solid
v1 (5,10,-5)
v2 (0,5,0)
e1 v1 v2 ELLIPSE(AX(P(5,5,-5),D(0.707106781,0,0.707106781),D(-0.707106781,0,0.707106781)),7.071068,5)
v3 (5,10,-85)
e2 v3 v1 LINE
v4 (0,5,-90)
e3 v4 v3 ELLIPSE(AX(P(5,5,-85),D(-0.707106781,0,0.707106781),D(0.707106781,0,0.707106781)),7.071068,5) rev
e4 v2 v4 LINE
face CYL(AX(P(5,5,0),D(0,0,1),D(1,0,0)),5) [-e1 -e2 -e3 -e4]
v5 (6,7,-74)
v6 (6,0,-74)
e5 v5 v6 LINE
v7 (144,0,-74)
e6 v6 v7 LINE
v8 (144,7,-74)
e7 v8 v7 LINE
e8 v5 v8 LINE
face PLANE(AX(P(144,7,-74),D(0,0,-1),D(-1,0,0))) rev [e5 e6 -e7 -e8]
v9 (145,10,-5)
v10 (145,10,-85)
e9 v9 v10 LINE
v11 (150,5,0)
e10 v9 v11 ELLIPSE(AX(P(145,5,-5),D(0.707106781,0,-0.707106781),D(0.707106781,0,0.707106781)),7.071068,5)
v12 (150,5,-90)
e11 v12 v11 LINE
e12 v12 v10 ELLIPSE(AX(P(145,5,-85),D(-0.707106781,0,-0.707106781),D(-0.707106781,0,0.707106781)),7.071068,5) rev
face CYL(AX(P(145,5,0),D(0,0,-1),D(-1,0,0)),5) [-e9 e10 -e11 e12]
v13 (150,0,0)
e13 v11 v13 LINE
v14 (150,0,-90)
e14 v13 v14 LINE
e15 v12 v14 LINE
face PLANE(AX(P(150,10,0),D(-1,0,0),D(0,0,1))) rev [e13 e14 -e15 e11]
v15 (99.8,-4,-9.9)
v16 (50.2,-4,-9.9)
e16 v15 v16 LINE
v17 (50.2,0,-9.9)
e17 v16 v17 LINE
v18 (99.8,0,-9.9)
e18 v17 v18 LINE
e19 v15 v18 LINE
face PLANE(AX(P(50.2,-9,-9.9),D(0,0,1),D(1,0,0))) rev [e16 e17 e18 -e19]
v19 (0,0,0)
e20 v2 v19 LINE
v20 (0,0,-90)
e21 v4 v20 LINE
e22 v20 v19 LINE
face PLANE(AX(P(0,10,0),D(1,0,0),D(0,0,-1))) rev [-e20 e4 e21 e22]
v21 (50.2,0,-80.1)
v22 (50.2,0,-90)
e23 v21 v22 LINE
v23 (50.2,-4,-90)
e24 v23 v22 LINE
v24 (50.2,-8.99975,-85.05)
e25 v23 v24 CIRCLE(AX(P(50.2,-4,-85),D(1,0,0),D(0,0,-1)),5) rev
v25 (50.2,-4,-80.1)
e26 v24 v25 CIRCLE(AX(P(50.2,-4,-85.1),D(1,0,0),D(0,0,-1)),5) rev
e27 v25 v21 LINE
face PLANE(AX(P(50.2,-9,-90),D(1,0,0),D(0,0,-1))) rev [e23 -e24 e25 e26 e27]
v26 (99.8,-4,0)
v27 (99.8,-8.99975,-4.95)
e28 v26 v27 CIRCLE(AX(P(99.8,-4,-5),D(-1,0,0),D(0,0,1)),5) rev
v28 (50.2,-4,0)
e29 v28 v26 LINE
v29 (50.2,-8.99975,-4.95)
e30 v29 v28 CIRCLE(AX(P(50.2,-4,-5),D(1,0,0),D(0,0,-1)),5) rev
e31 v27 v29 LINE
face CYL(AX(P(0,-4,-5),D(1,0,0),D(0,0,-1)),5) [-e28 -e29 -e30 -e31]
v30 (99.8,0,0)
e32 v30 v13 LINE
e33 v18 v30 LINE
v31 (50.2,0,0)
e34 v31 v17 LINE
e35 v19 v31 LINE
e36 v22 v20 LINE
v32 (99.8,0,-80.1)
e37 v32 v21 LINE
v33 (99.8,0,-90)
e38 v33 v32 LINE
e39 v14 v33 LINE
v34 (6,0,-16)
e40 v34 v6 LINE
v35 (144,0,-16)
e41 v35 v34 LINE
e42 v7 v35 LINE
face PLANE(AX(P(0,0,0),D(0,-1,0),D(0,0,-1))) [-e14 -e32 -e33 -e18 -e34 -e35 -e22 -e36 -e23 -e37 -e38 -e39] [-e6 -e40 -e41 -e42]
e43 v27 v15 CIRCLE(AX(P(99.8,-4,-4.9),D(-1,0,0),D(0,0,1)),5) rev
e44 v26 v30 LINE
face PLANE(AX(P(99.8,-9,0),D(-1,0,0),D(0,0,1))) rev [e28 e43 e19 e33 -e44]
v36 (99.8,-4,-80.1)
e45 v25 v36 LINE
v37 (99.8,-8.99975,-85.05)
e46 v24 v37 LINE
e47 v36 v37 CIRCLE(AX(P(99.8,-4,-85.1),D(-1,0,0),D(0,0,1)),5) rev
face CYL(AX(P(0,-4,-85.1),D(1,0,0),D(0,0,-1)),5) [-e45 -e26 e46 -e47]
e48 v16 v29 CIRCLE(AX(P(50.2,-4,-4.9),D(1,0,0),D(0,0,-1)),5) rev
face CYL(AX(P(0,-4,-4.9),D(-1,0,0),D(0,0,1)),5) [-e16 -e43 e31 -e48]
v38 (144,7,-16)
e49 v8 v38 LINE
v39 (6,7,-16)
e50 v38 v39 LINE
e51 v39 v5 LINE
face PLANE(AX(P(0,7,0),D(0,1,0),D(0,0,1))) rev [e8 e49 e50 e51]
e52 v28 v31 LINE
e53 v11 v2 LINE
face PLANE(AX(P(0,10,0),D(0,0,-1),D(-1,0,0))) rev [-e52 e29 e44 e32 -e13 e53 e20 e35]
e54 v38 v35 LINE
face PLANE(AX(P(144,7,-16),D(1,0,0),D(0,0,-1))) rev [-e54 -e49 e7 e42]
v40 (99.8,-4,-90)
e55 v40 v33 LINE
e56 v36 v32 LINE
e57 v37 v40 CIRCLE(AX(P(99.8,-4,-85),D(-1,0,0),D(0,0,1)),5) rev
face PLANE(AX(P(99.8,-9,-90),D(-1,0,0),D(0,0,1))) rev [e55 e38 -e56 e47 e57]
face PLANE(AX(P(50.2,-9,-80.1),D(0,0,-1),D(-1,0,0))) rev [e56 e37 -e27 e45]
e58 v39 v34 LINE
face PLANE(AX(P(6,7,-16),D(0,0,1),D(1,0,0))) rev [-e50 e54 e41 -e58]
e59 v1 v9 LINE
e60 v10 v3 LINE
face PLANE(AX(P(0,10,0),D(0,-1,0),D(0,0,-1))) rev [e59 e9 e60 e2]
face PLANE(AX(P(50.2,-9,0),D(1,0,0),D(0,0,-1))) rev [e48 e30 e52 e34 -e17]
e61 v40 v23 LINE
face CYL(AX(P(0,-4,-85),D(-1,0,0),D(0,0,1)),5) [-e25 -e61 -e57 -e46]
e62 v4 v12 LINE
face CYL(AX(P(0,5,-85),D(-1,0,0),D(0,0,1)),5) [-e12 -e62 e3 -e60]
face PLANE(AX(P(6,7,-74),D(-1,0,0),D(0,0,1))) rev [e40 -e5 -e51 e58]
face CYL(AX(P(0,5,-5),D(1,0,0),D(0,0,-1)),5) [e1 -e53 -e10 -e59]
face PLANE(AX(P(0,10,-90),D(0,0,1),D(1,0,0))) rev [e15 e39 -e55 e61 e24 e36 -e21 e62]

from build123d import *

# Parameters (mm, degrees)
SKETCH1_W           = 150
SKETCH1_H           = 90
BOSS_EXTRUDE1_DEPTH = 10
SKETCH2_W           = 49.6
SKETCH2_H           = 9.9
BOSS_EXTRUDE2_DEPTH = 9
SKETCH4_W           = 138
SKETCH4_H           = 58
CUT_EXTRUDE1_DEPTH  = 7
FILLET1_R           = 5


with BuildPart() as part:
    # Sketch1 → Boss-Extrude1 (new body)
    with BuildSketch(Plane(origin=(0, 0, 0), x_dir=(1, 0, 0), z_dir=(0, 1, 0))):
        with Locations((75, 45)):
            Rectangle(SKETCH1_W, SKETCH1_H)
    extrude(amount=BOSS_EXTRUDE1_DEPTH)

    # Sketch2 → Boss-Extrude2 (add)
    with BuildSketch(Plane.XZ):
        with Locations((75, -4.95)):
            Rectangle(SKETCH2_W, SKETCH2_H)
        with Locations((75, -85.05)):
            Rectangle(SKETCH2_W, SKETCH2_H)
    extrude(amount=BOSS_EXTRUDE2_DEPTH)

    # Sketch4 → Cut-Extrude1 (cut)
    with BuildSketch(Plane.XZ):
        with Locations((75, -45)):
            Rectangle(SKETCH4_W, SKETCH4_H)
    extrude(amount=-CUT_EXTRUDE1_DEPTH, mode=Mode.SUBTRACT)

    # Fillet1
    # the kernel refuses this fillet: 5 mm, written as the material it takes off along each edge
    with BuildSketch(Plane(origin=(112.3, -9, -80.1), x_dir=(0, 1, 0), z_dir=(-1, 0, 0)), Plane(origin=(37.7, -9, -90), x_dir=(0, 1, 0), z_dir=(1, 0, 0)), Plane(origin=(112.3, -9, -9.9), x_dir=(0, 0, 1), z_dir=(-1, 0, 0))) as fillet1_piece_1:
        with BuildLine():
            CenterArc((FILLET1_R, FILLET1_R), FILLET1_R, 180, 90)
            Line((0, FILLET1_R), (0, 0))
            Line((0, 0), (FILLET1_R, 0))
        make_face()
    extrude(amount=74.6, mode=Mode.SUBTRACT)
    with BuildSketch(Plane(origin=(37.7, -9, 0), x_dir=(0, 1, 0), z_dir=(1, 0, 0))) as fillet1_piece_2:
        with BuildLine():
            CenterArc((FILLET1_R, -FILLET1_R), FILLET1_R, 90, 90)
            Line((0, -FILLET1_R), (0, 0))
            Line((0, 0), (FILLET1_R, 0))
        make_face()
    extrude(amount=74.6, mode=Mode.SUBTRACT)
    with BuildSketch(Plane(origin=(150, 10, 12.5), x_dir=(-1, 0, 0), z_dir=(0, 0, -1))) as fillet1_piece_3:
        with BuildLine():
            CenterArc((FILLET1_R, -FILLET1_R), FILLET1_R, 90, 90)
            Line((0, -FILLET1_R), (0, 0))
            Line((0, 0), (FILLET1_R, 0))
        make_face()
    extrude(amount=115, mode=Mode.SUBTRACT)
    with BuildSketch(Plane(origin=(162.5, 10, -90), x_dir=(0, 0, 1), z_dir=(-1, 0, 0))) as fillet1_piece_4:
        with BuildLine():
            CenterArc((FILLET1_R, -FILLET1_R), FILLET1_R, 90, 90)
            Line((0, -FILLET1_R), (0, 0))
            Line((0, 0), (FILLET1_R, 0))
        make_face()
    extrude(amount=175, mode=Mode.SUBTRACT)
    with BuildSketch(Plane(origin=(-12.5, 10, 0), x_dir=(0, -1, 0), z_dir=(1, 0, 0))) as fillet1_piece_5:
        with BuildLine():
            CenterArc((FILLET1_R, FILLET1_R), FILLET1_R, 180, 90)
            Line((0, FILLET1_R), (0, 0))
            Line((0, 0), (FILLET1_R, 0))
        make_face()
    extrude(amount=175, mode=Mode.SUBTRACT)
    with BuildSketch(Plane(origin=(0, 10, -102.5), x_dir=(0, -1, 0), z_dir=(0, 0, 1))) as fillet1_piece_6:
        with BuildLine():
            CenterArc((FILLET1_R, FILLET1_R), FILLET1_R, 180, 90)
            Line((0, FILLET1_R), (0, 0))
            Line((0, 0), (FILLET1_R, 0))
        make_face()
    extrude(amount=115, mode=Mode.SUBTRACT)


solid = part.part
